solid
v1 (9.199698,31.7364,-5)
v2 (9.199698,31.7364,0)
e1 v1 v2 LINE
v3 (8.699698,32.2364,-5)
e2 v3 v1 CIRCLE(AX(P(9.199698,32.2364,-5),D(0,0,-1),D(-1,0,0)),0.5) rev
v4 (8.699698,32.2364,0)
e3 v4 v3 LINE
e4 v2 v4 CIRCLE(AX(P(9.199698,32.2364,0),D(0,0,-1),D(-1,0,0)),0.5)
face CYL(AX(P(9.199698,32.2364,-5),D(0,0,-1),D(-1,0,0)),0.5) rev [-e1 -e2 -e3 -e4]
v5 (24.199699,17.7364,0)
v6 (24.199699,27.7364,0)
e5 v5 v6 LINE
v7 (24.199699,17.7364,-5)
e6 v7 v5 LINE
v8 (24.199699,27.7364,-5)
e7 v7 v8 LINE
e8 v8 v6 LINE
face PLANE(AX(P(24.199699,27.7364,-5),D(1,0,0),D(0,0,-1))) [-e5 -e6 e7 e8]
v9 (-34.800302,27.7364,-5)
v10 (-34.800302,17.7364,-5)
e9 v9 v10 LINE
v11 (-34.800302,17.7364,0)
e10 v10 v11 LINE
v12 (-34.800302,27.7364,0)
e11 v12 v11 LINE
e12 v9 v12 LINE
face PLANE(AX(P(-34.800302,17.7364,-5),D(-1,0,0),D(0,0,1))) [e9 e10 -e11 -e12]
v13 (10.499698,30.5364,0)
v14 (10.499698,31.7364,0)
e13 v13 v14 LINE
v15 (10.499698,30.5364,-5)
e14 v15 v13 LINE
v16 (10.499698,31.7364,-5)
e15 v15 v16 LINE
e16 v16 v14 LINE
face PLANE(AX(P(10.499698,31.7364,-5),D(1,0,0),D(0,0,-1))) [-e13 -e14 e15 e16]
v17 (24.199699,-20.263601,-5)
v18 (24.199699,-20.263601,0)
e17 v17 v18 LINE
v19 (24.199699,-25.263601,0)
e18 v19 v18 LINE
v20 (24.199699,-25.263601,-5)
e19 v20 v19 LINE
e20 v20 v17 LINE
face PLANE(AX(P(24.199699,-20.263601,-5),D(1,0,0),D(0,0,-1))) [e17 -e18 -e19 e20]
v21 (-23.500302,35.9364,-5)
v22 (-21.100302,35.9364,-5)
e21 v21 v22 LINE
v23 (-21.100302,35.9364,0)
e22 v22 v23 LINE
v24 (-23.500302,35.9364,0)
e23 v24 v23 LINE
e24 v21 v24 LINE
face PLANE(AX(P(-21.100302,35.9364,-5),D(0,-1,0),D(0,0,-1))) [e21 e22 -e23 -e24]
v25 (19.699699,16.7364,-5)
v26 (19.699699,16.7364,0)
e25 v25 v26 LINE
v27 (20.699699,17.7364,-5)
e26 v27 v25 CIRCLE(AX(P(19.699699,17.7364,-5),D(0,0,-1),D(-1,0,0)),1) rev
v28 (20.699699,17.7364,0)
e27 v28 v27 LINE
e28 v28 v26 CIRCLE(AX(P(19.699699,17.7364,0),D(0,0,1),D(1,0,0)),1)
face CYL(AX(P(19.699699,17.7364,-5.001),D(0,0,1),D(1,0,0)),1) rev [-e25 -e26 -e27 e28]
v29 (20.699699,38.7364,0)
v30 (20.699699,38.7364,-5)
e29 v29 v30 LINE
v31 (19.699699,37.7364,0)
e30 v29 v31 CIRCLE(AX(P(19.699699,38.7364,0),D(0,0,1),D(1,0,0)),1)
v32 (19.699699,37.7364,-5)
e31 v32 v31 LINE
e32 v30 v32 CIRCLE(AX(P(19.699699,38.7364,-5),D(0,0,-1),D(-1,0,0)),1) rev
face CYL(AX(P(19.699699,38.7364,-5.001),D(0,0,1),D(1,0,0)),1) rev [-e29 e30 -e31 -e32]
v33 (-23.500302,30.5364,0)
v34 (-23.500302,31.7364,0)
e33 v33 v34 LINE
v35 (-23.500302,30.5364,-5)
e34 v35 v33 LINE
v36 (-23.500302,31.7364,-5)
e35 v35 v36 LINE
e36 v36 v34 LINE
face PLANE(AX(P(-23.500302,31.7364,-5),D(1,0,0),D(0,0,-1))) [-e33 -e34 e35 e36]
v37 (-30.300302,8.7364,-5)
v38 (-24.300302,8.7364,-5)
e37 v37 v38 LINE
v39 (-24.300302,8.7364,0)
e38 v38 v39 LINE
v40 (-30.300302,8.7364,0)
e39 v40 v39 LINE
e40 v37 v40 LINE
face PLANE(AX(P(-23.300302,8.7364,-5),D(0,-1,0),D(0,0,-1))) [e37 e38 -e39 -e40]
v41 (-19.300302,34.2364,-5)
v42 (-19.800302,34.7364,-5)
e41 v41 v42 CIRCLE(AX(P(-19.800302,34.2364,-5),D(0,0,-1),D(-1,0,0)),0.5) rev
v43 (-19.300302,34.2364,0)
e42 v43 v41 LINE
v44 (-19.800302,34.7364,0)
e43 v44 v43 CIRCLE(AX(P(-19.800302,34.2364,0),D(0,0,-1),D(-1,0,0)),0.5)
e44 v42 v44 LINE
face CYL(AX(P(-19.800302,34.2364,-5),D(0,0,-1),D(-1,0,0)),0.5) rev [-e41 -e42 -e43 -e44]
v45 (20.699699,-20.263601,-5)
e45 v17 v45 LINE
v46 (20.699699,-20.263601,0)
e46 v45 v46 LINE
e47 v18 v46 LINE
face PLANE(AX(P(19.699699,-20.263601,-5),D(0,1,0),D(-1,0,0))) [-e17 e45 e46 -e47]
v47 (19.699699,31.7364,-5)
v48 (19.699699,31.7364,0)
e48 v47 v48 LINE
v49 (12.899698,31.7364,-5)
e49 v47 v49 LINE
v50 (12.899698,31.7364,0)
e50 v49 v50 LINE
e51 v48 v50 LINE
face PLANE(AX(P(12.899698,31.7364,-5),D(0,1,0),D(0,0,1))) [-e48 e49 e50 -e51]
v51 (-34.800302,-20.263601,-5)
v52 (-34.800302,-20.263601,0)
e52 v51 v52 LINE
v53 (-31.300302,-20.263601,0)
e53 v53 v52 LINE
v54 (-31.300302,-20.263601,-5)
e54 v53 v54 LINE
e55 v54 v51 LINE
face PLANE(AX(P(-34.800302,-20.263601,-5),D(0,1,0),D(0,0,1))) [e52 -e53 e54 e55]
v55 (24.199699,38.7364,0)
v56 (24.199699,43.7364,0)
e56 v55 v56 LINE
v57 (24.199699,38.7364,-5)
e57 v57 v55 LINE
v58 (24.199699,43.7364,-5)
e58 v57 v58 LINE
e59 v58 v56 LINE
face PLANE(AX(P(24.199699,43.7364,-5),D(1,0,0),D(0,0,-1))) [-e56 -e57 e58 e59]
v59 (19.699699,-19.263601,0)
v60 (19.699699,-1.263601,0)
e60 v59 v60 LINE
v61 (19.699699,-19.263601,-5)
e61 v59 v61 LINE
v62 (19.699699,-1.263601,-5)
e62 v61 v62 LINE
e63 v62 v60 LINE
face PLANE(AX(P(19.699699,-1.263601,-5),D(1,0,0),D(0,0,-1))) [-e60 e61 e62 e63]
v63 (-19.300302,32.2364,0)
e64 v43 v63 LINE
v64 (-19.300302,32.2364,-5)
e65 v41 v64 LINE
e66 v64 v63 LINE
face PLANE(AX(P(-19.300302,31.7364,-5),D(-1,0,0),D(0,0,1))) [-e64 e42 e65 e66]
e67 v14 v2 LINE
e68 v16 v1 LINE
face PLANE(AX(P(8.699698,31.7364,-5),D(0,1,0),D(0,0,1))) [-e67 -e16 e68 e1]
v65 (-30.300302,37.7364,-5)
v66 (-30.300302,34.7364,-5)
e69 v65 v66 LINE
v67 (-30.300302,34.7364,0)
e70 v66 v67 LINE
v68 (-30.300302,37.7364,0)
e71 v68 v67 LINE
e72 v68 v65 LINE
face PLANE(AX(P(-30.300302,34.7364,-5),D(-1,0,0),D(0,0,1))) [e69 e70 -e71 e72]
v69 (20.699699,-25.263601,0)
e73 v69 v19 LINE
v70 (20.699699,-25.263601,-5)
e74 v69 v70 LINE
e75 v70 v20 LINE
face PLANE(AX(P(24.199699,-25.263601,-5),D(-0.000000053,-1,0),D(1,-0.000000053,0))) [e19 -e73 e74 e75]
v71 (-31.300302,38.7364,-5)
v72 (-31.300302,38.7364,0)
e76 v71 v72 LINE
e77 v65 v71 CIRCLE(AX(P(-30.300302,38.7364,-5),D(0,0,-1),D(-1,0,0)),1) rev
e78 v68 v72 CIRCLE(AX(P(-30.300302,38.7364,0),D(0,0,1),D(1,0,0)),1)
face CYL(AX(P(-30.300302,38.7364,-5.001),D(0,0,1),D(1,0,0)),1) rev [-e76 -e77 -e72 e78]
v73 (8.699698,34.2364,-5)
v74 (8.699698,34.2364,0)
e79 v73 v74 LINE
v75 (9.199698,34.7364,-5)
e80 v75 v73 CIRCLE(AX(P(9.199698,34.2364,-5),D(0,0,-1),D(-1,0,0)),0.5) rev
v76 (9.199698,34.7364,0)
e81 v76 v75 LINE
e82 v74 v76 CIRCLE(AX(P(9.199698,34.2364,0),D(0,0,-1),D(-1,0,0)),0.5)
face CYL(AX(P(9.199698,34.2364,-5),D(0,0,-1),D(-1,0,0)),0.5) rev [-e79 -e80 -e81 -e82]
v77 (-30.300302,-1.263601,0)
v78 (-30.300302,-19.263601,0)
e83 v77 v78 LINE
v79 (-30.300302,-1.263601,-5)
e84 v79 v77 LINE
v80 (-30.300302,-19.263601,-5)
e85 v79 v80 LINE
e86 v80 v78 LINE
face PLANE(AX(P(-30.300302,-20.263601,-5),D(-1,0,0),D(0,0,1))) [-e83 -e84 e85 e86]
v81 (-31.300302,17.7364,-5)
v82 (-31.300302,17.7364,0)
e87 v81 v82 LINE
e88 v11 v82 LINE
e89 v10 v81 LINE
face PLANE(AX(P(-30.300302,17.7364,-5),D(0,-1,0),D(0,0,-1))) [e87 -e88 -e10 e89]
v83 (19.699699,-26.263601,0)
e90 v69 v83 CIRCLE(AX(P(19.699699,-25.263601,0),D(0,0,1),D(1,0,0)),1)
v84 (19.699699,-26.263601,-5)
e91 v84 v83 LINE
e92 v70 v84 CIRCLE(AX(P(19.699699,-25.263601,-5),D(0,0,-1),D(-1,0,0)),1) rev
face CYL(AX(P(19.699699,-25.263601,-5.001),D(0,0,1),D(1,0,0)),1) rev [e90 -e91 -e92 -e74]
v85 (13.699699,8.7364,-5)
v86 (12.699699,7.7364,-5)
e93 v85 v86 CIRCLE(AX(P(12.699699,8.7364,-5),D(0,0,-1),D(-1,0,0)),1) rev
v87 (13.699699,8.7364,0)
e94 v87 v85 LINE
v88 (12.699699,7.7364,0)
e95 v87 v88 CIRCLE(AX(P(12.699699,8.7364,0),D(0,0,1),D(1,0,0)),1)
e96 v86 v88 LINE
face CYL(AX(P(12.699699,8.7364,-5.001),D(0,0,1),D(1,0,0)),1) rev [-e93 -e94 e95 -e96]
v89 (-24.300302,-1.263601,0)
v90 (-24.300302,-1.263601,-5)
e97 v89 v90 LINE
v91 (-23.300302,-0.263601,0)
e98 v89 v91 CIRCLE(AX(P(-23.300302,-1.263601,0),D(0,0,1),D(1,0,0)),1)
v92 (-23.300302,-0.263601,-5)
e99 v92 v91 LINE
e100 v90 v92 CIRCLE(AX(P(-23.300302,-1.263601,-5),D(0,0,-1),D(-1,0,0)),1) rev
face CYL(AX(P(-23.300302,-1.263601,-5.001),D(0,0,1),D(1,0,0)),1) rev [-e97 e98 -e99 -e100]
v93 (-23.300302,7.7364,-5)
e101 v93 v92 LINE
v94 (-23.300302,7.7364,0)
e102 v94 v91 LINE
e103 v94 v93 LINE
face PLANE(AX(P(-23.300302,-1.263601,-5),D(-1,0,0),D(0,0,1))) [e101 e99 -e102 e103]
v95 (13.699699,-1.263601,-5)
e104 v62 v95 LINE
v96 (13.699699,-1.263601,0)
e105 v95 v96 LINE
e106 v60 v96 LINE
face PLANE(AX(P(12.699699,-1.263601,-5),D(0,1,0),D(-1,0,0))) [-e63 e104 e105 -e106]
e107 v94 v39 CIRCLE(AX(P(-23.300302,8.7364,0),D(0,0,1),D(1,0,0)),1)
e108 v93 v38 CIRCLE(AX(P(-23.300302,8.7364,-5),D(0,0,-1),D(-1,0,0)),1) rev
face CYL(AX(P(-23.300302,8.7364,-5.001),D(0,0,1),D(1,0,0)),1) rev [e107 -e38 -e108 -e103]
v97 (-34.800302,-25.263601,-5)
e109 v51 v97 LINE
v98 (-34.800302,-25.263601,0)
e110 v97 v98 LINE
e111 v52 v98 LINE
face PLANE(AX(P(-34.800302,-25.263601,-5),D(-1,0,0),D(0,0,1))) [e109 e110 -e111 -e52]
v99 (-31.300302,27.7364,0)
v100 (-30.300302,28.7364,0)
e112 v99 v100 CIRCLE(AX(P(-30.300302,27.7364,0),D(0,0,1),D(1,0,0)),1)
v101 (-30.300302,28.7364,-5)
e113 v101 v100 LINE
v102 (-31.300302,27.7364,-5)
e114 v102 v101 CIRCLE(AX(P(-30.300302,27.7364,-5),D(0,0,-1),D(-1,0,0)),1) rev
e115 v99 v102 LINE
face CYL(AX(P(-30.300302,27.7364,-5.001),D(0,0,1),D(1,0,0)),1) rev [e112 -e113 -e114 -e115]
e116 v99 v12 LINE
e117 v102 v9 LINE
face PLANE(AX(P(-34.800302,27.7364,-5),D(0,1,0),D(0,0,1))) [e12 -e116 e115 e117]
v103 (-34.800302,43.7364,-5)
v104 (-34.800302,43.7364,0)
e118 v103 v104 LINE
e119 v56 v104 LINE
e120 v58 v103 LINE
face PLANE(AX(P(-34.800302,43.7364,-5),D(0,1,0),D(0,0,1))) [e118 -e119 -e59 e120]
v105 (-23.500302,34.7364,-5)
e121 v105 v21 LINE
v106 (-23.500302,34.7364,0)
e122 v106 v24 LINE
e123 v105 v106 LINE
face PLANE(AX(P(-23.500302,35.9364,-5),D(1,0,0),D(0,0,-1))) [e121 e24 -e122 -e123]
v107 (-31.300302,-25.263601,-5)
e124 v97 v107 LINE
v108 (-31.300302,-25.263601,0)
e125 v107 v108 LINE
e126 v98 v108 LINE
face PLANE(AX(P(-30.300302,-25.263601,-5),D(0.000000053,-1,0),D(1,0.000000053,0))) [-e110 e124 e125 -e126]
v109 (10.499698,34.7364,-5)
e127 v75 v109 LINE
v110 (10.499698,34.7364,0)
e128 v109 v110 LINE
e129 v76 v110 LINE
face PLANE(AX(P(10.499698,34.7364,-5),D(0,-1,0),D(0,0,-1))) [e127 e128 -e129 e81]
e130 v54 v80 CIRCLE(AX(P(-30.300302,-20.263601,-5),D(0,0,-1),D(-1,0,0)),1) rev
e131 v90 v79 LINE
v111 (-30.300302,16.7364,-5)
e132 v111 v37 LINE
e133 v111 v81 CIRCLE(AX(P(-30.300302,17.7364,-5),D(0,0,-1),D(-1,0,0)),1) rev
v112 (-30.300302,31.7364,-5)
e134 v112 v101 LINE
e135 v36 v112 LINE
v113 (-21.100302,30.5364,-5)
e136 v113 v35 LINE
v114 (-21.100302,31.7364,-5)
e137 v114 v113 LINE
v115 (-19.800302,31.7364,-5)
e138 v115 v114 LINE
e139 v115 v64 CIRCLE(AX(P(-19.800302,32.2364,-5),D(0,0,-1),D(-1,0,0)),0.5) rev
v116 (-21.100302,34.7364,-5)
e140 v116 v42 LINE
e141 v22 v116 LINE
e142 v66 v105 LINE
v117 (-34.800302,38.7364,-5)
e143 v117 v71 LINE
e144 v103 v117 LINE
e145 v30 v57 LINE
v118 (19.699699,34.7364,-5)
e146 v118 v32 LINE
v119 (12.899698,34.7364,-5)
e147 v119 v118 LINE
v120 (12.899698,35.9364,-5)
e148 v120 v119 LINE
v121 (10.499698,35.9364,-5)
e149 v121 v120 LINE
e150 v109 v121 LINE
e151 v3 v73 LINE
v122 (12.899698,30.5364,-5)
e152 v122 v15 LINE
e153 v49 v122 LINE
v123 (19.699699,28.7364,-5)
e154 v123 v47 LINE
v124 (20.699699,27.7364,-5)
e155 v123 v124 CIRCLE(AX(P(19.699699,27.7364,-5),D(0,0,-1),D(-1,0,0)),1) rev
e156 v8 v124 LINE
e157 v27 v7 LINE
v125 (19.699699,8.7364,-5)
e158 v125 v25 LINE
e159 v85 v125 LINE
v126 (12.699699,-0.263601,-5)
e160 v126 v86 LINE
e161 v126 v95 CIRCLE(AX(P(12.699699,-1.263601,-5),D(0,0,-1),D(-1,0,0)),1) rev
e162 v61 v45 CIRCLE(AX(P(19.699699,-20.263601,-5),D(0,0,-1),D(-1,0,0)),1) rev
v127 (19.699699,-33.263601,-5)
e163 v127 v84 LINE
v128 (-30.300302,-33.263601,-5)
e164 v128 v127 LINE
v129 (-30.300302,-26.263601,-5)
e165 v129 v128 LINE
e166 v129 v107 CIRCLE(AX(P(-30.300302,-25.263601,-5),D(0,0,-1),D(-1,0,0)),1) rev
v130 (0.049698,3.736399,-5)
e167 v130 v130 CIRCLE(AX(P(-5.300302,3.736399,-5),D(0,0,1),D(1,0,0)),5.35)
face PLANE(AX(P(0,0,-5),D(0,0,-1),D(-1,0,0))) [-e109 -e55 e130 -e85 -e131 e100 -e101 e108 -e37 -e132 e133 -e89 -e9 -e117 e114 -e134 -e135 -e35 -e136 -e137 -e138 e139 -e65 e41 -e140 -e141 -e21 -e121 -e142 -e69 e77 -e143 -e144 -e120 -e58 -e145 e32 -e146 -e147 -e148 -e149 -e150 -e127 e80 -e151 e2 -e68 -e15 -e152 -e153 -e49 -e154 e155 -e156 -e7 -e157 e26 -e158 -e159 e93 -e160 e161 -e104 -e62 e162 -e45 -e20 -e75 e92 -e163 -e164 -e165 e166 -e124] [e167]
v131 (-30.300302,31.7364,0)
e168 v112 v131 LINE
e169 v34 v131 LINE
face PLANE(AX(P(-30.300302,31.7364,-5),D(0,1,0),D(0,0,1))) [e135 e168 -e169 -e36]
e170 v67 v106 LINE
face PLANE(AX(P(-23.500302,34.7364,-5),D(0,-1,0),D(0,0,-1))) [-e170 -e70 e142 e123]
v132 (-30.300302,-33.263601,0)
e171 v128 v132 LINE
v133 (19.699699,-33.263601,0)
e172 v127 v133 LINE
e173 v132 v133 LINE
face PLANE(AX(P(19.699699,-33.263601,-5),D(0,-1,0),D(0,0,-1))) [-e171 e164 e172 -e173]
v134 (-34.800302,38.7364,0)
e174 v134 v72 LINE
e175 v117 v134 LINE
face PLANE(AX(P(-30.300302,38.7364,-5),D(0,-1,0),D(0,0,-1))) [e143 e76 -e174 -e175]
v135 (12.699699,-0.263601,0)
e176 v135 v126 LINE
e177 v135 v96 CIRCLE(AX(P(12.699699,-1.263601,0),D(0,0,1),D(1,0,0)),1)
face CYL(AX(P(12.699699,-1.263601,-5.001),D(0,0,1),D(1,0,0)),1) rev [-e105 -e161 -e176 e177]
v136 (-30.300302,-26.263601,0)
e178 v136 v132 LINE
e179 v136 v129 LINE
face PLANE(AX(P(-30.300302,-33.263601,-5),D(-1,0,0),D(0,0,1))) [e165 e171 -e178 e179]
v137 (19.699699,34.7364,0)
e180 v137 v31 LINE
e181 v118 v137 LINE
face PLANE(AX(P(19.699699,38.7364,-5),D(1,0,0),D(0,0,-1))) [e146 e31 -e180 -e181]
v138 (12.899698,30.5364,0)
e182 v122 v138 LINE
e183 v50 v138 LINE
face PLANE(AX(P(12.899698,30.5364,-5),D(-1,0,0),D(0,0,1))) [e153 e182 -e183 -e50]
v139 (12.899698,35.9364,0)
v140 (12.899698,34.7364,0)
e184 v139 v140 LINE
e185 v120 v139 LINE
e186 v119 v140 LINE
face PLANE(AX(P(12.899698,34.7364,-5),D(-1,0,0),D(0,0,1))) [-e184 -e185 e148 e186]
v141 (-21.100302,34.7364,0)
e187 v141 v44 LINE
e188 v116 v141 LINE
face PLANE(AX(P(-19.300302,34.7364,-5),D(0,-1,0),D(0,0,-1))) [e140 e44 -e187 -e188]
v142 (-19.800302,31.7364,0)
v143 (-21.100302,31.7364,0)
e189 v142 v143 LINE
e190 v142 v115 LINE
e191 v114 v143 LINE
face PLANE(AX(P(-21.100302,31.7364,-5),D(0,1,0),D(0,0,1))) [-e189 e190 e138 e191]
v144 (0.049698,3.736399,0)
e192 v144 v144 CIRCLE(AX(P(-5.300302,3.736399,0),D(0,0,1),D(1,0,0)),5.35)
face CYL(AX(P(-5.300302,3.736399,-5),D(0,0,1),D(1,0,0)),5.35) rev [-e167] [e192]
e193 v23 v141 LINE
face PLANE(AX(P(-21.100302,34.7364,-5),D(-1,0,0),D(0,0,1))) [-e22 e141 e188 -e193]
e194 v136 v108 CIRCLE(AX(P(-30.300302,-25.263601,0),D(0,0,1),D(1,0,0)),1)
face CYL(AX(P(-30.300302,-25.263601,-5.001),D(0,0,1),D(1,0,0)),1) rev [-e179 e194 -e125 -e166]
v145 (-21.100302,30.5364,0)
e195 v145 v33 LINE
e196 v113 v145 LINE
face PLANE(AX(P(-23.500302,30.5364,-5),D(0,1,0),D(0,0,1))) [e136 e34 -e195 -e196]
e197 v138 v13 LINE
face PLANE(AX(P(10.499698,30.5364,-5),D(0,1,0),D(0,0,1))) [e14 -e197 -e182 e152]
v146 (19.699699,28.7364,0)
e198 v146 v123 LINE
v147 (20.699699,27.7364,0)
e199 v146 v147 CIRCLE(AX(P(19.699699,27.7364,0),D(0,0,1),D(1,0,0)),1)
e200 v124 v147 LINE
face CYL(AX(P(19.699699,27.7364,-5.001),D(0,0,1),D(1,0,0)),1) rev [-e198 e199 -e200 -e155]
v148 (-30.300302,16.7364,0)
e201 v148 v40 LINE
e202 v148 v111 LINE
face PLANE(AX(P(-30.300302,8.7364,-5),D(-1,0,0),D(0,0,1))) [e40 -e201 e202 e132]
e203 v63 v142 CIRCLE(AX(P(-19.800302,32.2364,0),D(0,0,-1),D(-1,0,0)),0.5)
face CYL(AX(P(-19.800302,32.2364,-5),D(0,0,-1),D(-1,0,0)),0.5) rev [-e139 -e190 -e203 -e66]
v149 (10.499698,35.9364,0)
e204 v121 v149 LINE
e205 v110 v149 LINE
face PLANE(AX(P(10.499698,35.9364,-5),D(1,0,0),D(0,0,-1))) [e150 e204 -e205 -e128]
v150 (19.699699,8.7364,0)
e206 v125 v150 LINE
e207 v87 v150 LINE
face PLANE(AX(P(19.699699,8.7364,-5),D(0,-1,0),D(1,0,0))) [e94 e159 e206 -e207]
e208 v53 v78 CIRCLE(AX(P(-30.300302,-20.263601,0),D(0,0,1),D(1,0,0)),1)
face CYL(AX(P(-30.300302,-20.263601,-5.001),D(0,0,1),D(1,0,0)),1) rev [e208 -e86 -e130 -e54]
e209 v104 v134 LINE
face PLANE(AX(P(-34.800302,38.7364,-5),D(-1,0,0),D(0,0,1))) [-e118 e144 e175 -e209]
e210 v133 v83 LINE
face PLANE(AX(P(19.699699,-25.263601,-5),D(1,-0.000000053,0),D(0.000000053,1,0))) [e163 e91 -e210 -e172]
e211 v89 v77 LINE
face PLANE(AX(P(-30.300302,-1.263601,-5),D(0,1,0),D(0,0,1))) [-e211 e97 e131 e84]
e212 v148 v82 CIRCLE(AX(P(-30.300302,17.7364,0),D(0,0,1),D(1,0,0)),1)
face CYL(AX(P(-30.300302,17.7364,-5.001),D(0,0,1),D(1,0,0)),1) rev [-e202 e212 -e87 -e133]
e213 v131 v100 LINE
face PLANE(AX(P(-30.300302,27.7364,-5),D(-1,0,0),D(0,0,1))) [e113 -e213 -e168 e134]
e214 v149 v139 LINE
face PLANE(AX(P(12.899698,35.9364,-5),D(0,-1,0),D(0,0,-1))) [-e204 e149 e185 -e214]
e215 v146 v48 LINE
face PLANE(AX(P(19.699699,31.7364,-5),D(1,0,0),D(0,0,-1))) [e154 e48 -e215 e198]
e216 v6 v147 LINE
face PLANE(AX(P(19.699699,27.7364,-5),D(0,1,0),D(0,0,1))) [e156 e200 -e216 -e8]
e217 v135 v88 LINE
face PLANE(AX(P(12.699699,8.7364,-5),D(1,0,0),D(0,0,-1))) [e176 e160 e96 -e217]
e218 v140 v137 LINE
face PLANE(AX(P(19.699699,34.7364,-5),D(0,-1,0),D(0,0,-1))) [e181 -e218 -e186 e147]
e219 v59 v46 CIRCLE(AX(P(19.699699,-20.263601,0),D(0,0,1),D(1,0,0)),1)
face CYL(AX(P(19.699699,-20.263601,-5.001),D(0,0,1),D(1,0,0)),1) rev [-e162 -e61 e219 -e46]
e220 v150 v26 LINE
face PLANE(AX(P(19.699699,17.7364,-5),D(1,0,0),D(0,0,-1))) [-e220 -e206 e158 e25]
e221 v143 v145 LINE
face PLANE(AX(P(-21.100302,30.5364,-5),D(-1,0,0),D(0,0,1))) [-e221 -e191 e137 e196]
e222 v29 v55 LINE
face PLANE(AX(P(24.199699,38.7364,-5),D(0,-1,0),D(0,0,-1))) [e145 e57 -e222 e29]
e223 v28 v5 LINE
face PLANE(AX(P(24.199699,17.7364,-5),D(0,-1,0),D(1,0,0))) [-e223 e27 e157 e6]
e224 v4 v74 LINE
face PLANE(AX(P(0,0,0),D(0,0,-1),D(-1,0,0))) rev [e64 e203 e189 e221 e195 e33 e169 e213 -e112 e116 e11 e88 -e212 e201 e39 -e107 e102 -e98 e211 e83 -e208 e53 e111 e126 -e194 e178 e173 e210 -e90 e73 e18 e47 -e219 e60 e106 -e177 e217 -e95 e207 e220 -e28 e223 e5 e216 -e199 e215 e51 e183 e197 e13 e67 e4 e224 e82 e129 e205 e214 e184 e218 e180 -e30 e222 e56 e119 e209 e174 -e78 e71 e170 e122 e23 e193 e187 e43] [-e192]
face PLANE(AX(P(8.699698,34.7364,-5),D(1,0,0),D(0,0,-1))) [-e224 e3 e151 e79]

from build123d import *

# Parameters (mm, degrees)
ESBO_O1_R             = 5.35
FLANGE_BASE1_DEPTH    = 5
CORTE_EXTRUS_O1_REACH = 58.115
ESBO_O2_R             = 1
QUEBRA_CANTO1_START   = -5
QUEBRA_CANTO1_DEPTH   = 5


# Read off the part's stored shape, not the designer's step: Quebra-Canto1
# Sheet-metal steps are written as plain solids
with BuildPart() as part:
    # Esboço1 → Flange-base1 (new body)
    with BuildSketch(Plane.XY):
        Polygon((19.699698823, 8.736399513), (12.699698794, 8.736399513), (12.699698794, -1.263600636), (19.699698823, -1.263600636), (19.699698823, -20.26360068), (24.199698913, -20.26360068), (24.199698913, -25.263600799), (19.699698982, -25.263600562), (19.699698823, -28.263600308), (19.699698823, -33.263600919), (-30.300301832, -33.263600919), (-30.300301832, -28.263600308), (-30.30030199, -25.263600562), (-34.800301922, -25.263600799), (-34.800301922, -20.26360068), (-30.300301832, -20.26360068), (-30.300301832, -1.263600636), (-23.300301802, -1.263600636), (-23.300301802, 8.736399513), (-30.300301832, 8.736399513), (-30.300301832, 17.736399558), (-34.800301922, 17.736399558), (-34.800301922, 27.736399558), (-30.300301832, 27.736399558), (-30.300301832, 31.736399692), (-23.500301773, 31.736399692), (-23.500301773, 30.536399744), (-21.100301772, 30.536399744), (-21.100301772, 31.736399692), (-19.300301772, 31.736399692), (-19.300301772, 34.736399796), (-21.100301772, 34.736399796), (-21.100301772, 35.936399744), (-23.500301772, 35.936399744), (-23.500301772, 34.736399796), (-30.300301832, 34.736399796), (-30.300301832, 38.736399796), (-34.800301832, 38.736399796), (-34.800301832, 43.736399796), (24.199698817, 43.736399796), (24.199698817, 38.736399797), (19.699698817, 38.736399797), (19.699698817, 34.736399797), (12.899698227, 34.736399797), (12.899698227, 35.936399744), (10.499698227, 35.936399744), (10.499698227, 34.736399797), (8.699698168, 34.736399797), (8.699698168, 31.736399692), (10.499698227, 31.736399692), (10.499698227, 30.536399751), (12.899698233, 30.536399751), (12.899698233, 31.736399692), (19.699698823, 31.736399692), (19.699698823, 27.736399558), (24.199698913, 27.736399558), (24.199698913, 17.736399558), (19.699698823, 17.736399558), align=None)
        with Locations((-5.300301504, 3.736399439)):
            Circle(ESBO_O1_R, mode=Mode.SUBTRACT)
    extrude(amount=-FLANGE_BASE1_DEPTH)

    # Esboço2 → Corte-extrusão1 (cut, up to next)
    with BuildSketch(Plane.XY, mode=Mode.PRIVATE) as corte_extrus_o1_sk1:
        with Locations((-30.300301832, 38.736399796)):
            Circle(ESBO_O2_R)
    corte_extrus_o1_tool1 = extrude(corte_extrus_o1_sk1.sketch, amount=-CORTE_EXTRUS_O1_REACH, mode=Mode.PRIVATE) & part.part
    # Esboço2 → Corte-extrusão1 (cut, up to next)
    with BuildSketch(Plane.XY, mode=Mode.PRIVATE) as corte_extrus_o1_sk2:
        with Locations((-30.300301832, 27.736399558)):
            Circle(ESBO_O2_R)
    corte_extrus_o1_tool2 = extrude(corte_extrus_o1_sk2.sketch, amount=-CORTE_EXTRUS_O1_REACH, mode=Mode.PRIVATE) & part.part
    # Esboço2 → Corte-extrusão1 (cut, up to next)
    with BuildSketch(Plane.XY, mode=Mode.PRIVATE) as corte_extrus_o1_sk3:
        with Locations((-30.300301832, 17.736399558)):
            Circle(ESBO_O2_R)
    corte_extrus_o1_tool3 = extrude(corte_extrus_o1_sk3.sketch, amount=-CORTE_EXTRUS_O1_REACH, mode=Mode.PRIVATE) & part.part
    # Esboço2 → Corte-extrusão1 (cut, up to next)
    with BuildSketch(Plane.XY, mode=Mode.PRIVATE) as corte_extrus_o1_sk4:
        with Locations((-23.300301802, 8.736399513)):
            Circle(ESBO_O2_R)
    corte_extrus_o1_tool4 = extrude(corte_extrus_o1_sk4.sketch, amount=-CORTE_EXTRUS_O1_REACH, mode=Mode.PRIVATE) & part.part
    # Esboço2 → Corte-extrusão1 (cut, up to next)
    with BuildSketch(Plane.XY, mode=Mode.PRIVATE) as corte_extrus_o1_sk5:
        with Locations((-23.300301802, -1.263600636)):
            Circle(ESBO_O2_R)
    corte_extrus_o1_tool5 = extrude(corte_extrus_o1_sk5.sketch, amount=-CORTE_EXTRUS_O1_REACH, mode=Mode.PRIVATE) & part.part
    # Esboço2 → Corte-extrusão1 (cut, up to next)
    with BuildSketch(Plane.XY, mode=Mode.PRIVATE) as corte_extrus_o1_sk6:
        with Locations((-30.300301832, -20.26360068)):
            Circle(ESBO_O2_R)
    corte_extrus_o1_tool6 = extrude(corte_extrus_o1_sk6.sketch, amount=-CORTE_EXTRUS_O1_REACH, mode=Mode.PRIVATE) & part.part
    # Esboço2 → Corte-extrusão1 (cut, up to next)
    with BuildSketch(Plane.XY, mode=Mode.PRIVATE) as corte_extrus_o1_sk7:
        with Locations((-30.30030199, -25.263600562)):
            Circle(ESBO_O2_R)
    corte_extrus_o1_tool7 = extrude(corte_extrus_o1_sk7.sketch, amount=-CORTE_EXTRUS_O1_REACH, mode=Mode.PRIVATE) & part.part
    # Esboço2 → Corte-extrusão1 (cut, up to next)
    with BuildSketch(Plane.XY, mode=Mode.PRIVATE) as corte_extrus_o1_sk8:
        with Locations((19.699698982, -25.263600562)):
            Circle(ESBO_O2_R)
    corte_extrus_o1_tool8 = extrude(corte_extrus_o1_sk8.sketch, amount=-CORTE_EXTRUS_O1_REACH, mode=Mode.PRIVATE) & part.part
    # Esboço2 → Corte-extrusão1 (cut, up to next)
    with BuildSketch(Plane.XY, mode=Mode.PRIVATE) as corte_extrus_o1_sk9:
        with Locations((19.699698823, -20.26360068)):
            Circle(ESBO_O2_R)
    corte_extrus_o1_tool9 = extrude(corte_extrus_o1_sk9.sketch, amount=-CORTE_EXTRUS_O1_REACH, mode=Mode.PRIVATE) & part.part
    # Esboço2 → Corte-extrusão1 (cut, up to next)
    with BuildSketch(Plane.XY, mode=Mode.PRIVATE) as corte_extrus_o1_sk10:
        with Locations((12.699698794, 8.736399513)):
            Circle(ESBO_O2_R)
    corte_extrus_o1_tool10 = extrude(corte_extrus_o1_sk10.sketch, amount=-CORTE_EXTRUS_O1_REACH, mode=Mode.PRIVATE) & part.part
    # Esboço2 → Corte-extrusão1 (cut, up to next)
    with BuildSketch(Plane.XY, mode=Mode.PRIVATE) as corte_extrus_o1_sk11:
        with Locations((12.699698794, -1.263600636)):
            Circle(ESBO_O2_R)
    corte_extrus_o1_tool11 = extrude(corte_extrus_o1_sk11.sketch, amount=-CORTE_EXTRUS_O1_REACH, mode=Mode.PRIVATE) & part.part
    # Esboço2 → Corte-extrusão1 (cut, up to next)
    with BuildSketch(Plane.XY, mode=Mode.PRIVATE) as corte_extrus_o1_sk12:
        with Locations((19.699698823, 17.736399558)):
            Circle(ESBO_O2_R)
    corte_extrus_o1_tool12 = extrude(corte_extrus_o1_sk12.sketch, amount=-CORTE_EXTRUS_O1_REACH, mode=Mode.PRIVATE) & part.part
    # Esboço2 → Corte-extrusão1 (cut, up to next)
    with BuildSketch(Plane.XY, mode=Mode.PRIVATE) as corte_extrus_o1_sk13:
        with Locations((19.699698817, 38.736399797)):
            Circle(ESBO_O2_R)
    corte_extrus_o1_tool13 = extrude(corte_extrus_o1_sk13.sketch, amount=-CORTE_EXTRUS_O1_REACH, mode=Mode.PRIVATE) & part.part
    # Esboço2 → Corte-extrusão1 (cut, up to next)
    with BuildSketch(Plane.XY, mode=Mode.PRIVATE) as corte_extrus_o1_sk14:
        with Locations((19.699698823, 27.736399558)):
            Circle(ESBO_O2_R)
    corte_extrus_o1_tool14 = extrude(corte_extrus_o1_sk14.sketch, amount=-CORTE_EXTRUS_O1_REACH, mode=Mode.PRIVATE) & part.part
    add(corte_extrus_o1_tool1.solids().sort_by_distance((-30.300302, 38.7364, 0))[0], mode=Mode.SUBTRACT)
    add(corte_extrus_o1_tool2.solids().sort_by_distance((-30.300302, 27.7364, 0))[0], mode=Mode.SUBTRACT)
    add(corte_extrus_o1_tool3.solids().sort_by_distance((-30.300302, 17.7364, 0))[0], mode=Mode.SUBTRACT)
    add(corte_extrus_o1_tool4.solids().sort_by_distance((-23.300302, 8.7364, 0))[0], mode=Mode.SUBTRACT)
    add(corte_extrus_o1_tool5.solids().sort_by_distance((-23.300302, -1.263601, 0))[0], mode=Mode.SUBTRACT)
    add(corte_extrus_o1_tool6.solids().sort_by_distance((-30.300302, -20.263601, 0))[0], mode=Mode.SUBTRACT)
    add(corte_extrus_o1_tool7.solids().sort_by_distance((-30.300302, -25.263601, 0))[0], mode=Mode.SUBTRACT)
    add(corte_extrus_o1_tool8.solids().sort_by_distance((19.699699, -25.263601, 0))[0], mode=Mode.SUBTRACT)
    add(corte_extrus_o1_tool9.solids().sort_by_distance((19.699699, -20.263601, 0))[0], mode=Mode.SUBTRACT)
    add(corte_extrus_o1_tool10.solids().sort_by_distance((12.699699, 8.7364, 0))[0], mode=Mode.SUBTRACT)
    add(corte_extrus_o1_tool11.solids().sort_by_distance((12.699699, -1.263601, 0))[0], mode=Mode.SUBTRACT)
    add(corte_extrus_o1_tool12.solids().sort_by_distance((19.699699, 17.7364, 0))[0], mode=Mode.SUBTRACT)
    add(corte_extrus_o1_tool13.solids().sort_by_distance((19.699699, 38.7364, 0))[0], mode=Mode.SUBTRACT)
    add(corte_extrus_o1_tool14.solids().sort_by_distance((19.699699, 27.7364, 0))[0], mode=Mode.SUBTRACT)

    # Quebra-Canto1 outline → Quebra-Canto1 (add)
    with BuildSketch(Plane.XY.offset(QUEBRA_CANTO1_START)):
        with BuildLine():
            Line((8.699698168, 34.736399797), (8.699698168, 34.236399797))
            ThreePointArc((8.699698168, 34.236399797), (8.846144777, 34.589953188), (9.199698168, 34.736399797))
            Line((9.199698168, 34.736399797), (8.699698168, 34.736399797))
        make_face()
        with BuildLine():
            ThreePointArc((9.199698168, 31.736399692), (8.846144777, 31.882846301), (8.699698168, 32.236399692))
            Line((8.699698168, 32.236399692), (8.699698168, 31.736399692))
            Line((8.699698168, 31.736399692), (9.199698168, 31.736399692))
        make_face()
        with BuildLine():
            Line((-19.300301772, 31.736399692), (-19.300301772, 32.236399692))
            ThreePointArc((-19.300301772, 32.236399692), (-19.446748382, 31.882846301), (-19.800301772, 31.736399692))
            Line((-19.800301772, 31.736399692), (-19.300301772, 31.736399692))
        make_face()
        with BuildLine():
            ThreePointArc((-19.800301772, 34.736399796), (-19.446748382, 34.589953186), (-19.300301772, 34.236399796))
            Line((-19.300301772, 34.236399796), (-19.300301772, 34.736399796))
            Line((-19.300301772, 34.736399796), (-19.800301772, 34.736399796))
        make_face()
    extrude(amount=QUEBRA_CANTO1_DEPTH)


solid = part.part
